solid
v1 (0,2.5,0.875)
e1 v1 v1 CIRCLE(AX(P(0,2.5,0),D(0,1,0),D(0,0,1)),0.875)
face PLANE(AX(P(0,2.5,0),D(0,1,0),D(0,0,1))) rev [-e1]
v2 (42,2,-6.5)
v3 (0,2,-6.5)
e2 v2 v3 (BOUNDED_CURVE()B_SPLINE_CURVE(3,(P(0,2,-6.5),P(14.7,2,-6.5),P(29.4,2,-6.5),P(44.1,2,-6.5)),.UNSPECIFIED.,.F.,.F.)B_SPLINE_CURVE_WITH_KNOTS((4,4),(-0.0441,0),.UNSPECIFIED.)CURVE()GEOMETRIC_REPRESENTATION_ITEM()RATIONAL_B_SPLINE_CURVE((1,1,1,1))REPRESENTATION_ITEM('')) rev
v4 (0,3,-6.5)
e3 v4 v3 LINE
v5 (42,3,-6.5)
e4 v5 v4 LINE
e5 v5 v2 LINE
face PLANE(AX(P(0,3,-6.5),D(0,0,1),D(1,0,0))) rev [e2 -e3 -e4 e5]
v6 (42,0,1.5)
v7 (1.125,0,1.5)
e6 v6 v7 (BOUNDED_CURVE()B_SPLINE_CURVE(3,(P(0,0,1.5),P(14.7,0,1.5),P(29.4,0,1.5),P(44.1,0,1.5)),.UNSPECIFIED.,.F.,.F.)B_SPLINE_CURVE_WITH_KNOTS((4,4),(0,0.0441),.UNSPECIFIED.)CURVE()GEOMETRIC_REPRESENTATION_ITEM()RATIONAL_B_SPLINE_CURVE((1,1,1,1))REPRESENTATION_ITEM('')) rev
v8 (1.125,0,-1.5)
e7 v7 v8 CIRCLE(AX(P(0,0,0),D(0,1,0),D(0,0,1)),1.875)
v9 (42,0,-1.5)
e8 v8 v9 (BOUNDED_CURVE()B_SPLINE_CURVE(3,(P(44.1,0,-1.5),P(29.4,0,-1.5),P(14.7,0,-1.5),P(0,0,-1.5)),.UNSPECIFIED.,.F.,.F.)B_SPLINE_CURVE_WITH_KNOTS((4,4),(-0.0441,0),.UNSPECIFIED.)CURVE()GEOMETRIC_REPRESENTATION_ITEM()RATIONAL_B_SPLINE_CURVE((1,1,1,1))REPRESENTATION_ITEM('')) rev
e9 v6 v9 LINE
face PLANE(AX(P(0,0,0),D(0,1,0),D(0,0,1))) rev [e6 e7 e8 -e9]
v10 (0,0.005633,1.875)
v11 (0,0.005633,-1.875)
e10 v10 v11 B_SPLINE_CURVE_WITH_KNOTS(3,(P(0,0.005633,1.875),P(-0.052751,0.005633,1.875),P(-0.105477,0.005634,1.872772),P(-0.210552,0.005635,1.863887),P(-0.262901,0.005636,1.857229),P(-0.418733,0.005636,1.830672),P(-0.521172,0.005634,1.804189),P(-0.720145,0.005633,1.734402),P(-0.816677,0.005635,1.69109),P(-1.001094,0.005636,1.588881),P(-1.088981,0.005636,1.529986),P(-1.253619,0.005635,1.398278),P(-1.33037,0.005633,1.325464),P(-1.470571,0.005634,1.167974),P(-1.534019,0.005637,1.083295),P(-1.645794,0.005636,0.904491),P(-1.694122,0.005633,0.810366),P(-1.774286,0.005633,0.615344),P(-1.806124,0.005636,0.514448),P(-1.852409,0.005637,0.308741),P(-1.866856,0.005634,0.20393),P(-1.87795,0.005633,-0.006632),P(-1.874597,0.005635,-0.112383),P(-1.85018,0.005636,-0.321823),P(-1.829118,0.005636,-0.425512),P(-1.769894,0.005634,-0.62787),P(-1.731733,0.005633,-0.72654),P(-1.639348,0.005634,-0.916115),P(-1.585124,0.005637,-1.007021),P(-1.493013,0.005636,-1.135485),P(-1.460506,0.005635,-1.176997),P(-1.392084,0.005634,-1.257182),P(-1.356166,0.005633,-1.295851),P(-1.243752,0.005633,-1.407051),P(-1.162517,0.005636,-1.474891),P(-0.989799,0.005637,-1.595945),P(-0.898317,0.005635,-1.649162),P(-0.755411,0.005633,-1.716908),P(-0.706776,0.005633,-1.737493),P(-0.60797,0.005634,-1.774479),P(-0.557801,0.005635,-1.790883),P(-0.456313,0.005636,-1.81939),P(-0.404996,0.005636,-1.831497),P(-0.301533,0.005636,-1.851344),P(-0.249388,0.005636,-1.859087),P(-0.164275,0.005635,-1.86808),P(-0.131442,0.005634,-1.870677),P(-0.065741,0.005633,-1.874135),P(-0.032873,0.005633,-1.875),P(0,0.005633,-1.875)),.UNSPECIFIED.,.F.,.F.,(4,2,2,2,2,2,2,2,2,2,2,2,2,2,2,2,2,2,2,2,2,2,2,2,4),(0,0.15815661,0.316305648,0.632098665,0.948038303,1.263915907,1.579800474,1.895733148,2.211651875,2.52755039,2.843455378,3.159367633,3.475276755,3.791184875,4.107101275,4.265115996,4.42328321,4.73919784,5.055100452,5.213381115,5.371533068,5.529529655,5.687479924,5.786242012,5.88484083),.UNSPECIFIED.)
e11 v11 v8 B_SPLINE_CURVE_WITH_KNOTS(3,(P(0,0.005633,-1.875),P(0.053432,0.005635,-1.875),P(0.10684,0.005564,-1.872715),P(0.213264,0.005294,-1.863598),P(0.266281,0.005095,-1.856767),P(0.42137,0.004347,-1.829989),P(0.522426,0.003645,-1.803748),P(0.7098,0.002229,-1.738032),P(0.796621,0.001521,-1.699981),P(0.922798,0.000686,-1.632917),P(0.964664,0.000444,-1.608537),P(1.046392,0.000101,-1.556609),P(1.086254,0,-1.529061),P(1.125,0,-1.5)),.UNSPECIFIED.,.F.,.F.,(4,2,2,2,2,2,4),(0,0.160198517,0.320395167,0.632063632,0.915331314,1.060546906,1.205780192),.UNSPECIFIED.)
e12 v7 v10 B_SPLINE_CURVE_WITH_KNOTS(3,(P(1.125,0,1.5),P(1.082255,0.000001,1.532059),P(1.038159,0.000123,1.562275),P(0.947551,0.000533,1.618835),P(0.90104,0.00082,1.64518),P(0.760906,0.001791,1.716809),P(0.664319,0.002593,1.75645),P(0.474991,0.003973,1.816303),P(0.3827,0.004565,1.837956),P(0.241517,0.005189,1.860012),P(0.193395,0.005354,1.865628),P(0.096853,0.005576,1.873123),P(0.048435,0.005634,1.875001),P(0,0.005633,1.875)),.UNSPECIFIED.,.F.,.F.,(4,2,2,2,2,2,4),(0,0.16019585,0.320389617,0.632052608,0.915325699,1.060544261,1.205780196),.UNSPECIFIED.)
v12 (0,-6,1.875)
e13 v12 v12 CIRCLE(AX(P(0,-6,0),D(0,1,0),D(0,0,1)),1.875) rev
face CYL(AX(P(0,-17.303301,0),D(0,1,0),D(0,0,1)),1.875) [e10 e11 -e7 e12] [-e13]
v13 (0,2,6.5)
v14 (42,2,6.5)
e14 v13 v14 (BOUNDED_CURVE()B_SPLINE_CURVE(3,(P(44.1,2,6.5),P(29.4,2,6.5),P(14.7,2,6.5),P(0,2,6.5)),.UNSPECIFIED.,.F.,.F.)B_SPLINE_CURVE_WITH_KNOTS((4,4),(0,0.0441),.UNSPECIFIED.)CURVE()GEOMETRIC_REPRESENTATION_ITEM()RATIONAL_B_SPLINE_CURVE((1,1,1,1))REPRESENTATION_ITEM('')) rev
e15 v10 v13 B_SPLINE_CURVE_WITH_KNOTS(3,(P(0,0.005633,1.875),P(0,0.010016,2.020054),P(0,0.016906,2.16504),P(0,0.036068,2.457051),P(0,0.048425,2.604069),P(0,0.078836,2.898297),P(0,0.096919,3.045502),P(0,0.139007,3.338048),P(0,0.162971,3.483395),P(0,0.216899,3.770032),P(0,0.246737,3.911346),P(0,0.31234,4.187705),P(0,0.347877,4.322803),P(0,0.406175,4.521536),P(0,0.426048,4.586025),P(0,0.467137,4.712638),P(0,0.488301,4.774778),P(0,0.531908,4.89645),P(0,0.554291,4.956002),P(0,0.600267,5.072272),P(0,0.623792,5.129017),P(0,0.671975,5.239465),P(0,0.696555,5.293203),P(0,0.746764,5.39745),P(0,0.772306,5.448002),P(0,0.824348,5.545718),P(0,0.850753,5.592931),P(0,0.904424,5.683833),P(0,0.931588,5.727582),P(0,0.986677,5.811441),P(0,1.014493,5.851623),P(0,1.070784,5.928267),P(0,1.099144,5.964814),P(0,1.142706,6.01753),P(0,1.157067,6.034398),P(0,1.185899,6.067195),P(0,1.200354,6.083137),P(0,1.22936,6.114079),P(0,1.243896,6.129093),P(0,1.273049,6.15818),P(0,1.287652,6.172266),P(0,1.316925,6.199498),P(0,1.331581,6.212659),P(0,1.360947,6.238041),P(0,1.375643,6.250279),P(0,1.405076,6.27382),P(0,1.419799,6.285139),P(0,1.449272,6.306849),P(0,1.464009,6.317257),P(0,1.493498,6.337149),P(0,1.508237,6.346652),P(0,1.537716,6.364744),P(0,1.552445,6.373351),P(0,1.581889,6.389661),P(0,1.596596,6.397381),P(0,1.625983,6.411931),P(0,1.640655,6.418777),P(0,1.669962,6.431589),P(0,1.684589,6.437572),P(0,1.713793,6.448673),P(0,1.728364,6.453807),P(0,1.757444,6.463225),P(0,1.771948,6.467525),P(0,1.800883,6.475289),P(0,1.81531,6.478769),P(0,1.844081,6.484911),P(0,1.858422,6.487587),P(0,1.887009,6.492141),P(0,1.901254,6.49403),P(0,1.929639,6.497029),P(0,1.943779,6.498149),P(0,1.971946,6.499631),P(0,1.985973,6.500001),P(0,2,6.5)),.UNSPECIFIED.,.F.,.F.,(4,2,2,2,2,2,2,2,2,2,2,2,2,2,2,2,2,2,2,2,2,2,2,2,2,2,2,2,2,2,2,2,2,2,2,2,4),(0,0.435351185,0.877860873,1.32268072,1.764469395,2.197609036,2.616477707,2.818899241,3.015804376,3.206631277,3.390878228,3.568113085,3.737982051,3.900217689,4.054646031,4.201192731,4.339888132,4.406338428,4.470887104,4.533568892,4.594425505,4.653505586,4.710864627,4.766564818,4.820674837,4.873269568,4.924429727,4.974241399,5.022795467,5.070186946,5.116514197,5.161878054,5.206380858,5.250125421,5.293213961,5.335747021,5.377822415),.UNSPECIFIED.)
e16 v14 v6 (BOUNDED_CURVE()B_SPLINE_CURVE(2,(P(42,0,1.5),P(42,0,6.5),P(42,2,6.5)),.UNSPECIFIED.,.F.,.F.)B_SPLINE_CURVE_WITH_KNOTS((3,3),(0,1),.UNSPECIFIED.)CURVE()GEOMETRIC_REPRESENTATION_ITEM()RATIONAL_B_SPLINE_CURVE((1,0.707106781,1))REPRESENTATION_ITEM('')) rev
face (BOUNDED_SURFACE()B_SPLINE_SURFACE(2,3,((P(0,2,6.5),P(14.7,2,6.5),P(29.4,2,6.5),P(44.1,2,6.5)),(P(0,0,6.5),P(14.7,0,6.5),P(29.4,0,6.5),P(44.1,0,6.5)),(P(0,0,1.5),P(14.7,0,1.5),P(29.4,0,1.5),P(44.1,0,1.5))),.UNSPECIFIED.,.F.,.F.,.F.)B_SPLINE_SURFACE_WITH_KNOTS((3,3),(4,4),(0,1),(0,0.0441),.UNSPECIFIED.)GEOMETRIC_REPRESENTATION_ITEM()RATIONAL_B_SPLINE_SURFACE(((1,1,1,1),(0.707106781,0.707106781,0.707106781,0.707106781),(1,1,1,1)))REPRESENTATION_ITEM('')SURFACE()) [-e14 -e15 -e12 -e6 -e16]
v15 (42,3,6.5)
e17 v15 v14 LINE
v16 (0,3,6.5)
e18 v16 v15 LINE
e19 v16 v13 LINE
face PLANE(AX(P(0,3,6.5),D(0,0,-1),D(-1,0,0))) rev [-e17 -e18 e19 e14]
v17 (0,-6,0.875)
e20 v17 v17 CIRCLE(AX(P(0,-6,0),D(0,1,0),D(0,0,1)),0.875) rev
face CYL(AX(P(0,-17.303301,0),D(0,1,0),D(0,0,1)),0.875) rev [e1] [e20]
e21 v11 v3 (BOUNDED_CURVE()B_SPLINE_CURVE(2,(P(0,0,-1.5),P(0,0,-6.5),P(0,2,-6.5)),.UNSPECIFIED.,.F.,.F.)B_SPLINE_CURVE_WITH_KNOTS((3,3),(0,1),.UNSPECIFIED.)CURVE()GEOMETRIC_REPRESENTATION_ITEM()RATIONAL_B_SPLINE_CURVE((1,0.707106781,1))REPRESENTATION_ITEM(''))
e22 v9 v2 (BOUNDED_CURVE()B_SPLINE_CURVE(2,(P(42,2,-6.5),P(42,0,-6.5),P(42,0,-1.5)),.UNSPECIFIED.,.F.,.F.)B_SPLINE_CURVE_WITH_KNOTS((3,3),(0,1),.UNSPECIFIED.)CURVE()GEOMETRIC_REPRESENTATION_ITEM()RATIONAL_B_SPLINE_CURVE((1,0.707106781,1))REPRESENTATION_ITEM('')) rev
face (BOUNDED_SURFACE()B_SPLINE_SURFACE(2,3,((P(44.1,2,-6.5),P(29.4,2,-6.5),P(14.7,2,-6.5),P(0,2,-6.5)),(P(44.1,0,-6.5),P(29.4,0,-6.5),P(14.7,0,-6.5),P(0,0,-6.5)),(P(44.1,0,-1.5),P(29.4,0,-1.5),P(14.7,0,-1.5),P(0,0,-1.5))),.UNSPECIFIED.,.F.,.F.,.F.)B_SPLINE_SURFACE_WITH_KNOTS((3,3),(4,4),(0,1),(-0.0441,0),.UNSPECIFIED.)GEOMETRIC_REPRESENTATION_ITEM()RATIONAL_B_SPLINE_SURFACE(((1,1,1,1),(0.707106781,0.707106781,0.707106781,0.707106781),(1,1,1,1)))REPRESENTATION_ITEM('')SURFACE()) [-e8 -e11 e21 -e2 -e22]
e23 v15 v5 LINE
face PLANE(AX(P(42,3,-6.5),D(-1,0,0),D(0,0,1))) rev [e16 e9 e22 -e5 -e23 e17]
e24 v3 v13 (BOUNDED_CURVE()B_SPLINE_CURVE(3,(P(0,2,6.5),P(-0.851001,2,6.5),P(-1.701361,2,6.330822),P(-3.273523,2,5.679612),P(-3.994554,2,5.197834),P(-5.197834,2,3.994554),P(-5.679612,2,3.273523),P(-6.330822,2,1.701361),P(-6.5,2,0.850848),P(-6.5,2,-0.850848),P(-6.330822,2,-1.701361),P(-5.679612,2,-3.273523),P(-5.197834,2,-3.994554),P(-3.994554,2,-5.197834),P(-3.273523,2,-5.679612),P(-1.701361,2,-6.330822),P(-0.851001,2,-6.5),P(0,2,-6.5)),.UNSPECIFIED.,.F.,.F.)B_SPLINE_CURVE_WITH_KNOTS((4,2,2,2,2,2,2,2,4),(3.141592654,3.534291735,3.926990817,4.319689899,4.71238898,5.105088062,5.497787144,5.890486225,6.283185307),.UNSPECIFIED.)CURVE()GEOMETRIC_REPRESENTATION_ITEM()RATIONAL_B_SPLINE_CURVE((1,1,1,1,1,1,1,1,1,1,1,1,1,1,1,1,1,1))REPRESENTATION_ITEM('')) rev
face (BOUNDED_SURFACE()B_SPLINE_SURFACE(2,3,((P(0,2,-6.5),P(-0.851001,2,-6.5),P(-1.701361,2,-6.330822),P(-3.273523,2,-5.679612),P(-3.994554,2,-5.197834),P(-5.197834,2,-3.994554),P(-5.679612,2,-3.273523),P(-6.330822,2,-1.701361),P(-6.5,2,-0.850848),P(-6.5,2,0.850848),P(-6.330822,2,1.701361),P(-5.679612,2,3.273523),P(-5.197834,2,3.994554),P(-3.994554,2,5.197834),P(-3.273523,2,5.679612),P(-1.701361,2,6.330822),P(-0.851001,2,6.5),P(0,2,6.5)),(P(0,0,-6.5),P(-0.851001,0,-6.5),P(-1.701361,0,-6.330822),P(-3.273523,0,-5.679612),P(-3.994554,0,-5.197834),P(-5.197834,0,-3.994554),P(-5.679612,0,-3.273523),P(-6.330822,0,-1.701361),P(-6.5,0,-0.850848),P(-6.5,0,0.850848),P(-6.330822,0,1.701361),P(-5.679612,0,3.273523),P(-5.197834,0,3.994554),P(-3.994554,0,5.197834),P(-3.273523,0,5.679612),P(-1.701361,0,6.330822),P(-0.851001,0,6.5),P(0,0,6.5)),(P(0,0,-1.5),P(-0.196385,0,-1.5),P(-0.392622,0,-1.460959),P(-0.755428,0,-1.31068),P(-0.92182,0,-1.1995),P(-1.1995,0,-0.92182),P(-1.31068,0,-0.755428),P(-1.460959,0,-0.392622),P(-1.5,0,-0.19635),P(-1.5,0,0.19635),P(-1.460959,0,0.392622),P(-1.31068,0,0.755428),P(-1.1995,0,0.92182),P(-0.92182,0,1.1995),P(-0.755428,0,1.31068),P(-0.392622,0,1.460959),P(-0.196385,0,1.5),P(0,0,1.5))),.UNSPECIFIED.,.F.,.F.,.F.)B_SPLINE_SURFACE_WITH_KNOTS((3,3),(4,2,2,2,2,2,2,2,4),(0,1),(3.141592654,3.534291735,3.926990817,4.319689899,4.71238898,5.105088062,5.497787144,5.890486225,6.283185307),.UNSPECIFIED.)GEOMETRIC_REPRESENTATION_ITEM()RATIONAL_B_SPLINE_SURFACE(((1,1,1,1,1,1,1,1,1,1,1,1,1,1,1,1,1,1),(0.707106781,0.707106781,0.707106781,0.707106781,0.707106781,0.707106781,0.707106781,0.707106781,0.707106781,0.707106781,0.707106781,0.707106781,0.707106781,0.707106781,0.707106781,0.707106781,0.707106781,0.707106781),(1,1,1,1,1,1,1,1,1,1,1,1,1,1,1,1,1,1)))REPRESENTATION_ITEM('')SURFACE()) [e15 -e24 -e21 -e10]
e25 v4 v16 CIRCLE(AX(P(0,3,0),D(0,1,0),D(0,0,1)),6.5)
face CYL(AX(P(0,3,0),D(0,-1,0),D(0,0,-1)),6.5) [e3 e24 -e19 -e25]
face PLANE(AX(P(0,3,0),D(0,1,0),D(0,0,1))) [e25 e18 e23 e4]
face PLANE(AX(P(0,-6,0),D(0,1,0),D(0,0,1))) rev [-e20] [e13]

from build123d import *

# Parameters (mm, degrees)
BOSS_EXTRUDE1_DEPTH = 3
FILLET1_SIZE        = 2
FILLET1_SIZE_2      = 5
SKETCH2_R           = 1.875
SKETCH2_R_2         = 0.875
BOSS_EXTRUDE3_DEPTH = 9
CUT_EXTRUDE2_START  = -0.5
SKETCH4_R           = 0.875
CUT_EXTRUDE2_DEPTH  = 43.942490853


with BuildPart() as part:
    # Sketch1 → Boss-Extrude1 (new body)
    with BuildSketch(Plane(origin=(0, 0, 0), x_dir=(1, 0, 0), z_dir=(0, 1, 0))):
        with BuildLine():
            Line((0, 6.5), (42, 6.5))
            Line((42, 6.5), (42, -6.5))
            Line((42, -6.5), (0, -6.5))
            ThreePointArc((0, -6.5), (-6.5, 0), (0, 6.5))
        make_face()
    extrude(amount=BOSS_EXTRUDE1_DEPTH)

    # Fillet1
    # an asymmetric fillet: 5, 2 mm, written as the material it takes off along each edge
    with BuildSketch(Plane(origin=(0, 0, -6.5), x_dir=(0, 1, 0), z_dir=(1, 0, 0)), Plane(origin=(54.5, 0, 6.5), x_dir=(0, 1, 0), z_dir=(-1, 0, 0))) as fillet1_piece_1:
        with BuildLine():
            Bezier((FILLET1_SIZE, 0), (0, 0), (0, FILLET1_SIZE_2), weights=[1, 0.707106781, 1])
            Line((0, FILLET1_SIZE_2), (0, 0))
            Line((0, 0), (FILLET1_SIZE, 0))
        make_face()
    extrude(amount=54.5, mode=Mode.SUBTRACT)
    with BuildSketch(Plane(origin=(0, 0, 0), x_dir=(0, 0, 1), z_dir=(1, 0, 0))) as fillet1_piece_2:
        with BuildLine():
            Bezier((6.5, -FILLET1_SIZE), (6.5, 0), (6.5 - FILLET1_SIZE_2, 0), weights=[1, 0.707106781, 1])
            Line((6.5 - FILLET1_SIZE_2, 0), (6.5, 0))
            Line((6.5, 0), (6.5, -FILLET1_SIZE))
        make_face()
    revolve(axis=Axis((0, 0, 0), (0, -1, 0)), revolution_arc=180, mode=Mode.SUBTRACT)

    # Sketch2 → Boss-Extrude3 (add)
    with BuildSketch(Plane(origin=(0, 3, 0), x_dir=(1, 0, 0), z_dir=(0, 1, 0))):
        with Locations(Location((0, 0, 0), (0, 0, 270))):
            Circle(SKETCH2_R)
        with Locations(Location((0, 0, 0), (0, 0, 270))):
            Circle(SKETCH2_R_2, mode=Mode.SUBTRACT)
    extrude(amount=-BOSS_EXTRUDE3_DEPTH)

    # Sketch4 → Cut-Extrude2 (cut, through all)
    with BuildSketch(Plane(origin=(0, 3, 0), x_dir=(1, 0, 0), z_dir=(0, 1, 0)).offset(CUT_EXTRUDE2_START)):
        with Locations(Location((0, 0, 0), (0, 0, 270))):
            Circle(SKETCH4_R)
    extrude(amount=-CUT_EXTRUDE2_DEPTH, mode=Mode.SUBTRACT)


solid = part.part
